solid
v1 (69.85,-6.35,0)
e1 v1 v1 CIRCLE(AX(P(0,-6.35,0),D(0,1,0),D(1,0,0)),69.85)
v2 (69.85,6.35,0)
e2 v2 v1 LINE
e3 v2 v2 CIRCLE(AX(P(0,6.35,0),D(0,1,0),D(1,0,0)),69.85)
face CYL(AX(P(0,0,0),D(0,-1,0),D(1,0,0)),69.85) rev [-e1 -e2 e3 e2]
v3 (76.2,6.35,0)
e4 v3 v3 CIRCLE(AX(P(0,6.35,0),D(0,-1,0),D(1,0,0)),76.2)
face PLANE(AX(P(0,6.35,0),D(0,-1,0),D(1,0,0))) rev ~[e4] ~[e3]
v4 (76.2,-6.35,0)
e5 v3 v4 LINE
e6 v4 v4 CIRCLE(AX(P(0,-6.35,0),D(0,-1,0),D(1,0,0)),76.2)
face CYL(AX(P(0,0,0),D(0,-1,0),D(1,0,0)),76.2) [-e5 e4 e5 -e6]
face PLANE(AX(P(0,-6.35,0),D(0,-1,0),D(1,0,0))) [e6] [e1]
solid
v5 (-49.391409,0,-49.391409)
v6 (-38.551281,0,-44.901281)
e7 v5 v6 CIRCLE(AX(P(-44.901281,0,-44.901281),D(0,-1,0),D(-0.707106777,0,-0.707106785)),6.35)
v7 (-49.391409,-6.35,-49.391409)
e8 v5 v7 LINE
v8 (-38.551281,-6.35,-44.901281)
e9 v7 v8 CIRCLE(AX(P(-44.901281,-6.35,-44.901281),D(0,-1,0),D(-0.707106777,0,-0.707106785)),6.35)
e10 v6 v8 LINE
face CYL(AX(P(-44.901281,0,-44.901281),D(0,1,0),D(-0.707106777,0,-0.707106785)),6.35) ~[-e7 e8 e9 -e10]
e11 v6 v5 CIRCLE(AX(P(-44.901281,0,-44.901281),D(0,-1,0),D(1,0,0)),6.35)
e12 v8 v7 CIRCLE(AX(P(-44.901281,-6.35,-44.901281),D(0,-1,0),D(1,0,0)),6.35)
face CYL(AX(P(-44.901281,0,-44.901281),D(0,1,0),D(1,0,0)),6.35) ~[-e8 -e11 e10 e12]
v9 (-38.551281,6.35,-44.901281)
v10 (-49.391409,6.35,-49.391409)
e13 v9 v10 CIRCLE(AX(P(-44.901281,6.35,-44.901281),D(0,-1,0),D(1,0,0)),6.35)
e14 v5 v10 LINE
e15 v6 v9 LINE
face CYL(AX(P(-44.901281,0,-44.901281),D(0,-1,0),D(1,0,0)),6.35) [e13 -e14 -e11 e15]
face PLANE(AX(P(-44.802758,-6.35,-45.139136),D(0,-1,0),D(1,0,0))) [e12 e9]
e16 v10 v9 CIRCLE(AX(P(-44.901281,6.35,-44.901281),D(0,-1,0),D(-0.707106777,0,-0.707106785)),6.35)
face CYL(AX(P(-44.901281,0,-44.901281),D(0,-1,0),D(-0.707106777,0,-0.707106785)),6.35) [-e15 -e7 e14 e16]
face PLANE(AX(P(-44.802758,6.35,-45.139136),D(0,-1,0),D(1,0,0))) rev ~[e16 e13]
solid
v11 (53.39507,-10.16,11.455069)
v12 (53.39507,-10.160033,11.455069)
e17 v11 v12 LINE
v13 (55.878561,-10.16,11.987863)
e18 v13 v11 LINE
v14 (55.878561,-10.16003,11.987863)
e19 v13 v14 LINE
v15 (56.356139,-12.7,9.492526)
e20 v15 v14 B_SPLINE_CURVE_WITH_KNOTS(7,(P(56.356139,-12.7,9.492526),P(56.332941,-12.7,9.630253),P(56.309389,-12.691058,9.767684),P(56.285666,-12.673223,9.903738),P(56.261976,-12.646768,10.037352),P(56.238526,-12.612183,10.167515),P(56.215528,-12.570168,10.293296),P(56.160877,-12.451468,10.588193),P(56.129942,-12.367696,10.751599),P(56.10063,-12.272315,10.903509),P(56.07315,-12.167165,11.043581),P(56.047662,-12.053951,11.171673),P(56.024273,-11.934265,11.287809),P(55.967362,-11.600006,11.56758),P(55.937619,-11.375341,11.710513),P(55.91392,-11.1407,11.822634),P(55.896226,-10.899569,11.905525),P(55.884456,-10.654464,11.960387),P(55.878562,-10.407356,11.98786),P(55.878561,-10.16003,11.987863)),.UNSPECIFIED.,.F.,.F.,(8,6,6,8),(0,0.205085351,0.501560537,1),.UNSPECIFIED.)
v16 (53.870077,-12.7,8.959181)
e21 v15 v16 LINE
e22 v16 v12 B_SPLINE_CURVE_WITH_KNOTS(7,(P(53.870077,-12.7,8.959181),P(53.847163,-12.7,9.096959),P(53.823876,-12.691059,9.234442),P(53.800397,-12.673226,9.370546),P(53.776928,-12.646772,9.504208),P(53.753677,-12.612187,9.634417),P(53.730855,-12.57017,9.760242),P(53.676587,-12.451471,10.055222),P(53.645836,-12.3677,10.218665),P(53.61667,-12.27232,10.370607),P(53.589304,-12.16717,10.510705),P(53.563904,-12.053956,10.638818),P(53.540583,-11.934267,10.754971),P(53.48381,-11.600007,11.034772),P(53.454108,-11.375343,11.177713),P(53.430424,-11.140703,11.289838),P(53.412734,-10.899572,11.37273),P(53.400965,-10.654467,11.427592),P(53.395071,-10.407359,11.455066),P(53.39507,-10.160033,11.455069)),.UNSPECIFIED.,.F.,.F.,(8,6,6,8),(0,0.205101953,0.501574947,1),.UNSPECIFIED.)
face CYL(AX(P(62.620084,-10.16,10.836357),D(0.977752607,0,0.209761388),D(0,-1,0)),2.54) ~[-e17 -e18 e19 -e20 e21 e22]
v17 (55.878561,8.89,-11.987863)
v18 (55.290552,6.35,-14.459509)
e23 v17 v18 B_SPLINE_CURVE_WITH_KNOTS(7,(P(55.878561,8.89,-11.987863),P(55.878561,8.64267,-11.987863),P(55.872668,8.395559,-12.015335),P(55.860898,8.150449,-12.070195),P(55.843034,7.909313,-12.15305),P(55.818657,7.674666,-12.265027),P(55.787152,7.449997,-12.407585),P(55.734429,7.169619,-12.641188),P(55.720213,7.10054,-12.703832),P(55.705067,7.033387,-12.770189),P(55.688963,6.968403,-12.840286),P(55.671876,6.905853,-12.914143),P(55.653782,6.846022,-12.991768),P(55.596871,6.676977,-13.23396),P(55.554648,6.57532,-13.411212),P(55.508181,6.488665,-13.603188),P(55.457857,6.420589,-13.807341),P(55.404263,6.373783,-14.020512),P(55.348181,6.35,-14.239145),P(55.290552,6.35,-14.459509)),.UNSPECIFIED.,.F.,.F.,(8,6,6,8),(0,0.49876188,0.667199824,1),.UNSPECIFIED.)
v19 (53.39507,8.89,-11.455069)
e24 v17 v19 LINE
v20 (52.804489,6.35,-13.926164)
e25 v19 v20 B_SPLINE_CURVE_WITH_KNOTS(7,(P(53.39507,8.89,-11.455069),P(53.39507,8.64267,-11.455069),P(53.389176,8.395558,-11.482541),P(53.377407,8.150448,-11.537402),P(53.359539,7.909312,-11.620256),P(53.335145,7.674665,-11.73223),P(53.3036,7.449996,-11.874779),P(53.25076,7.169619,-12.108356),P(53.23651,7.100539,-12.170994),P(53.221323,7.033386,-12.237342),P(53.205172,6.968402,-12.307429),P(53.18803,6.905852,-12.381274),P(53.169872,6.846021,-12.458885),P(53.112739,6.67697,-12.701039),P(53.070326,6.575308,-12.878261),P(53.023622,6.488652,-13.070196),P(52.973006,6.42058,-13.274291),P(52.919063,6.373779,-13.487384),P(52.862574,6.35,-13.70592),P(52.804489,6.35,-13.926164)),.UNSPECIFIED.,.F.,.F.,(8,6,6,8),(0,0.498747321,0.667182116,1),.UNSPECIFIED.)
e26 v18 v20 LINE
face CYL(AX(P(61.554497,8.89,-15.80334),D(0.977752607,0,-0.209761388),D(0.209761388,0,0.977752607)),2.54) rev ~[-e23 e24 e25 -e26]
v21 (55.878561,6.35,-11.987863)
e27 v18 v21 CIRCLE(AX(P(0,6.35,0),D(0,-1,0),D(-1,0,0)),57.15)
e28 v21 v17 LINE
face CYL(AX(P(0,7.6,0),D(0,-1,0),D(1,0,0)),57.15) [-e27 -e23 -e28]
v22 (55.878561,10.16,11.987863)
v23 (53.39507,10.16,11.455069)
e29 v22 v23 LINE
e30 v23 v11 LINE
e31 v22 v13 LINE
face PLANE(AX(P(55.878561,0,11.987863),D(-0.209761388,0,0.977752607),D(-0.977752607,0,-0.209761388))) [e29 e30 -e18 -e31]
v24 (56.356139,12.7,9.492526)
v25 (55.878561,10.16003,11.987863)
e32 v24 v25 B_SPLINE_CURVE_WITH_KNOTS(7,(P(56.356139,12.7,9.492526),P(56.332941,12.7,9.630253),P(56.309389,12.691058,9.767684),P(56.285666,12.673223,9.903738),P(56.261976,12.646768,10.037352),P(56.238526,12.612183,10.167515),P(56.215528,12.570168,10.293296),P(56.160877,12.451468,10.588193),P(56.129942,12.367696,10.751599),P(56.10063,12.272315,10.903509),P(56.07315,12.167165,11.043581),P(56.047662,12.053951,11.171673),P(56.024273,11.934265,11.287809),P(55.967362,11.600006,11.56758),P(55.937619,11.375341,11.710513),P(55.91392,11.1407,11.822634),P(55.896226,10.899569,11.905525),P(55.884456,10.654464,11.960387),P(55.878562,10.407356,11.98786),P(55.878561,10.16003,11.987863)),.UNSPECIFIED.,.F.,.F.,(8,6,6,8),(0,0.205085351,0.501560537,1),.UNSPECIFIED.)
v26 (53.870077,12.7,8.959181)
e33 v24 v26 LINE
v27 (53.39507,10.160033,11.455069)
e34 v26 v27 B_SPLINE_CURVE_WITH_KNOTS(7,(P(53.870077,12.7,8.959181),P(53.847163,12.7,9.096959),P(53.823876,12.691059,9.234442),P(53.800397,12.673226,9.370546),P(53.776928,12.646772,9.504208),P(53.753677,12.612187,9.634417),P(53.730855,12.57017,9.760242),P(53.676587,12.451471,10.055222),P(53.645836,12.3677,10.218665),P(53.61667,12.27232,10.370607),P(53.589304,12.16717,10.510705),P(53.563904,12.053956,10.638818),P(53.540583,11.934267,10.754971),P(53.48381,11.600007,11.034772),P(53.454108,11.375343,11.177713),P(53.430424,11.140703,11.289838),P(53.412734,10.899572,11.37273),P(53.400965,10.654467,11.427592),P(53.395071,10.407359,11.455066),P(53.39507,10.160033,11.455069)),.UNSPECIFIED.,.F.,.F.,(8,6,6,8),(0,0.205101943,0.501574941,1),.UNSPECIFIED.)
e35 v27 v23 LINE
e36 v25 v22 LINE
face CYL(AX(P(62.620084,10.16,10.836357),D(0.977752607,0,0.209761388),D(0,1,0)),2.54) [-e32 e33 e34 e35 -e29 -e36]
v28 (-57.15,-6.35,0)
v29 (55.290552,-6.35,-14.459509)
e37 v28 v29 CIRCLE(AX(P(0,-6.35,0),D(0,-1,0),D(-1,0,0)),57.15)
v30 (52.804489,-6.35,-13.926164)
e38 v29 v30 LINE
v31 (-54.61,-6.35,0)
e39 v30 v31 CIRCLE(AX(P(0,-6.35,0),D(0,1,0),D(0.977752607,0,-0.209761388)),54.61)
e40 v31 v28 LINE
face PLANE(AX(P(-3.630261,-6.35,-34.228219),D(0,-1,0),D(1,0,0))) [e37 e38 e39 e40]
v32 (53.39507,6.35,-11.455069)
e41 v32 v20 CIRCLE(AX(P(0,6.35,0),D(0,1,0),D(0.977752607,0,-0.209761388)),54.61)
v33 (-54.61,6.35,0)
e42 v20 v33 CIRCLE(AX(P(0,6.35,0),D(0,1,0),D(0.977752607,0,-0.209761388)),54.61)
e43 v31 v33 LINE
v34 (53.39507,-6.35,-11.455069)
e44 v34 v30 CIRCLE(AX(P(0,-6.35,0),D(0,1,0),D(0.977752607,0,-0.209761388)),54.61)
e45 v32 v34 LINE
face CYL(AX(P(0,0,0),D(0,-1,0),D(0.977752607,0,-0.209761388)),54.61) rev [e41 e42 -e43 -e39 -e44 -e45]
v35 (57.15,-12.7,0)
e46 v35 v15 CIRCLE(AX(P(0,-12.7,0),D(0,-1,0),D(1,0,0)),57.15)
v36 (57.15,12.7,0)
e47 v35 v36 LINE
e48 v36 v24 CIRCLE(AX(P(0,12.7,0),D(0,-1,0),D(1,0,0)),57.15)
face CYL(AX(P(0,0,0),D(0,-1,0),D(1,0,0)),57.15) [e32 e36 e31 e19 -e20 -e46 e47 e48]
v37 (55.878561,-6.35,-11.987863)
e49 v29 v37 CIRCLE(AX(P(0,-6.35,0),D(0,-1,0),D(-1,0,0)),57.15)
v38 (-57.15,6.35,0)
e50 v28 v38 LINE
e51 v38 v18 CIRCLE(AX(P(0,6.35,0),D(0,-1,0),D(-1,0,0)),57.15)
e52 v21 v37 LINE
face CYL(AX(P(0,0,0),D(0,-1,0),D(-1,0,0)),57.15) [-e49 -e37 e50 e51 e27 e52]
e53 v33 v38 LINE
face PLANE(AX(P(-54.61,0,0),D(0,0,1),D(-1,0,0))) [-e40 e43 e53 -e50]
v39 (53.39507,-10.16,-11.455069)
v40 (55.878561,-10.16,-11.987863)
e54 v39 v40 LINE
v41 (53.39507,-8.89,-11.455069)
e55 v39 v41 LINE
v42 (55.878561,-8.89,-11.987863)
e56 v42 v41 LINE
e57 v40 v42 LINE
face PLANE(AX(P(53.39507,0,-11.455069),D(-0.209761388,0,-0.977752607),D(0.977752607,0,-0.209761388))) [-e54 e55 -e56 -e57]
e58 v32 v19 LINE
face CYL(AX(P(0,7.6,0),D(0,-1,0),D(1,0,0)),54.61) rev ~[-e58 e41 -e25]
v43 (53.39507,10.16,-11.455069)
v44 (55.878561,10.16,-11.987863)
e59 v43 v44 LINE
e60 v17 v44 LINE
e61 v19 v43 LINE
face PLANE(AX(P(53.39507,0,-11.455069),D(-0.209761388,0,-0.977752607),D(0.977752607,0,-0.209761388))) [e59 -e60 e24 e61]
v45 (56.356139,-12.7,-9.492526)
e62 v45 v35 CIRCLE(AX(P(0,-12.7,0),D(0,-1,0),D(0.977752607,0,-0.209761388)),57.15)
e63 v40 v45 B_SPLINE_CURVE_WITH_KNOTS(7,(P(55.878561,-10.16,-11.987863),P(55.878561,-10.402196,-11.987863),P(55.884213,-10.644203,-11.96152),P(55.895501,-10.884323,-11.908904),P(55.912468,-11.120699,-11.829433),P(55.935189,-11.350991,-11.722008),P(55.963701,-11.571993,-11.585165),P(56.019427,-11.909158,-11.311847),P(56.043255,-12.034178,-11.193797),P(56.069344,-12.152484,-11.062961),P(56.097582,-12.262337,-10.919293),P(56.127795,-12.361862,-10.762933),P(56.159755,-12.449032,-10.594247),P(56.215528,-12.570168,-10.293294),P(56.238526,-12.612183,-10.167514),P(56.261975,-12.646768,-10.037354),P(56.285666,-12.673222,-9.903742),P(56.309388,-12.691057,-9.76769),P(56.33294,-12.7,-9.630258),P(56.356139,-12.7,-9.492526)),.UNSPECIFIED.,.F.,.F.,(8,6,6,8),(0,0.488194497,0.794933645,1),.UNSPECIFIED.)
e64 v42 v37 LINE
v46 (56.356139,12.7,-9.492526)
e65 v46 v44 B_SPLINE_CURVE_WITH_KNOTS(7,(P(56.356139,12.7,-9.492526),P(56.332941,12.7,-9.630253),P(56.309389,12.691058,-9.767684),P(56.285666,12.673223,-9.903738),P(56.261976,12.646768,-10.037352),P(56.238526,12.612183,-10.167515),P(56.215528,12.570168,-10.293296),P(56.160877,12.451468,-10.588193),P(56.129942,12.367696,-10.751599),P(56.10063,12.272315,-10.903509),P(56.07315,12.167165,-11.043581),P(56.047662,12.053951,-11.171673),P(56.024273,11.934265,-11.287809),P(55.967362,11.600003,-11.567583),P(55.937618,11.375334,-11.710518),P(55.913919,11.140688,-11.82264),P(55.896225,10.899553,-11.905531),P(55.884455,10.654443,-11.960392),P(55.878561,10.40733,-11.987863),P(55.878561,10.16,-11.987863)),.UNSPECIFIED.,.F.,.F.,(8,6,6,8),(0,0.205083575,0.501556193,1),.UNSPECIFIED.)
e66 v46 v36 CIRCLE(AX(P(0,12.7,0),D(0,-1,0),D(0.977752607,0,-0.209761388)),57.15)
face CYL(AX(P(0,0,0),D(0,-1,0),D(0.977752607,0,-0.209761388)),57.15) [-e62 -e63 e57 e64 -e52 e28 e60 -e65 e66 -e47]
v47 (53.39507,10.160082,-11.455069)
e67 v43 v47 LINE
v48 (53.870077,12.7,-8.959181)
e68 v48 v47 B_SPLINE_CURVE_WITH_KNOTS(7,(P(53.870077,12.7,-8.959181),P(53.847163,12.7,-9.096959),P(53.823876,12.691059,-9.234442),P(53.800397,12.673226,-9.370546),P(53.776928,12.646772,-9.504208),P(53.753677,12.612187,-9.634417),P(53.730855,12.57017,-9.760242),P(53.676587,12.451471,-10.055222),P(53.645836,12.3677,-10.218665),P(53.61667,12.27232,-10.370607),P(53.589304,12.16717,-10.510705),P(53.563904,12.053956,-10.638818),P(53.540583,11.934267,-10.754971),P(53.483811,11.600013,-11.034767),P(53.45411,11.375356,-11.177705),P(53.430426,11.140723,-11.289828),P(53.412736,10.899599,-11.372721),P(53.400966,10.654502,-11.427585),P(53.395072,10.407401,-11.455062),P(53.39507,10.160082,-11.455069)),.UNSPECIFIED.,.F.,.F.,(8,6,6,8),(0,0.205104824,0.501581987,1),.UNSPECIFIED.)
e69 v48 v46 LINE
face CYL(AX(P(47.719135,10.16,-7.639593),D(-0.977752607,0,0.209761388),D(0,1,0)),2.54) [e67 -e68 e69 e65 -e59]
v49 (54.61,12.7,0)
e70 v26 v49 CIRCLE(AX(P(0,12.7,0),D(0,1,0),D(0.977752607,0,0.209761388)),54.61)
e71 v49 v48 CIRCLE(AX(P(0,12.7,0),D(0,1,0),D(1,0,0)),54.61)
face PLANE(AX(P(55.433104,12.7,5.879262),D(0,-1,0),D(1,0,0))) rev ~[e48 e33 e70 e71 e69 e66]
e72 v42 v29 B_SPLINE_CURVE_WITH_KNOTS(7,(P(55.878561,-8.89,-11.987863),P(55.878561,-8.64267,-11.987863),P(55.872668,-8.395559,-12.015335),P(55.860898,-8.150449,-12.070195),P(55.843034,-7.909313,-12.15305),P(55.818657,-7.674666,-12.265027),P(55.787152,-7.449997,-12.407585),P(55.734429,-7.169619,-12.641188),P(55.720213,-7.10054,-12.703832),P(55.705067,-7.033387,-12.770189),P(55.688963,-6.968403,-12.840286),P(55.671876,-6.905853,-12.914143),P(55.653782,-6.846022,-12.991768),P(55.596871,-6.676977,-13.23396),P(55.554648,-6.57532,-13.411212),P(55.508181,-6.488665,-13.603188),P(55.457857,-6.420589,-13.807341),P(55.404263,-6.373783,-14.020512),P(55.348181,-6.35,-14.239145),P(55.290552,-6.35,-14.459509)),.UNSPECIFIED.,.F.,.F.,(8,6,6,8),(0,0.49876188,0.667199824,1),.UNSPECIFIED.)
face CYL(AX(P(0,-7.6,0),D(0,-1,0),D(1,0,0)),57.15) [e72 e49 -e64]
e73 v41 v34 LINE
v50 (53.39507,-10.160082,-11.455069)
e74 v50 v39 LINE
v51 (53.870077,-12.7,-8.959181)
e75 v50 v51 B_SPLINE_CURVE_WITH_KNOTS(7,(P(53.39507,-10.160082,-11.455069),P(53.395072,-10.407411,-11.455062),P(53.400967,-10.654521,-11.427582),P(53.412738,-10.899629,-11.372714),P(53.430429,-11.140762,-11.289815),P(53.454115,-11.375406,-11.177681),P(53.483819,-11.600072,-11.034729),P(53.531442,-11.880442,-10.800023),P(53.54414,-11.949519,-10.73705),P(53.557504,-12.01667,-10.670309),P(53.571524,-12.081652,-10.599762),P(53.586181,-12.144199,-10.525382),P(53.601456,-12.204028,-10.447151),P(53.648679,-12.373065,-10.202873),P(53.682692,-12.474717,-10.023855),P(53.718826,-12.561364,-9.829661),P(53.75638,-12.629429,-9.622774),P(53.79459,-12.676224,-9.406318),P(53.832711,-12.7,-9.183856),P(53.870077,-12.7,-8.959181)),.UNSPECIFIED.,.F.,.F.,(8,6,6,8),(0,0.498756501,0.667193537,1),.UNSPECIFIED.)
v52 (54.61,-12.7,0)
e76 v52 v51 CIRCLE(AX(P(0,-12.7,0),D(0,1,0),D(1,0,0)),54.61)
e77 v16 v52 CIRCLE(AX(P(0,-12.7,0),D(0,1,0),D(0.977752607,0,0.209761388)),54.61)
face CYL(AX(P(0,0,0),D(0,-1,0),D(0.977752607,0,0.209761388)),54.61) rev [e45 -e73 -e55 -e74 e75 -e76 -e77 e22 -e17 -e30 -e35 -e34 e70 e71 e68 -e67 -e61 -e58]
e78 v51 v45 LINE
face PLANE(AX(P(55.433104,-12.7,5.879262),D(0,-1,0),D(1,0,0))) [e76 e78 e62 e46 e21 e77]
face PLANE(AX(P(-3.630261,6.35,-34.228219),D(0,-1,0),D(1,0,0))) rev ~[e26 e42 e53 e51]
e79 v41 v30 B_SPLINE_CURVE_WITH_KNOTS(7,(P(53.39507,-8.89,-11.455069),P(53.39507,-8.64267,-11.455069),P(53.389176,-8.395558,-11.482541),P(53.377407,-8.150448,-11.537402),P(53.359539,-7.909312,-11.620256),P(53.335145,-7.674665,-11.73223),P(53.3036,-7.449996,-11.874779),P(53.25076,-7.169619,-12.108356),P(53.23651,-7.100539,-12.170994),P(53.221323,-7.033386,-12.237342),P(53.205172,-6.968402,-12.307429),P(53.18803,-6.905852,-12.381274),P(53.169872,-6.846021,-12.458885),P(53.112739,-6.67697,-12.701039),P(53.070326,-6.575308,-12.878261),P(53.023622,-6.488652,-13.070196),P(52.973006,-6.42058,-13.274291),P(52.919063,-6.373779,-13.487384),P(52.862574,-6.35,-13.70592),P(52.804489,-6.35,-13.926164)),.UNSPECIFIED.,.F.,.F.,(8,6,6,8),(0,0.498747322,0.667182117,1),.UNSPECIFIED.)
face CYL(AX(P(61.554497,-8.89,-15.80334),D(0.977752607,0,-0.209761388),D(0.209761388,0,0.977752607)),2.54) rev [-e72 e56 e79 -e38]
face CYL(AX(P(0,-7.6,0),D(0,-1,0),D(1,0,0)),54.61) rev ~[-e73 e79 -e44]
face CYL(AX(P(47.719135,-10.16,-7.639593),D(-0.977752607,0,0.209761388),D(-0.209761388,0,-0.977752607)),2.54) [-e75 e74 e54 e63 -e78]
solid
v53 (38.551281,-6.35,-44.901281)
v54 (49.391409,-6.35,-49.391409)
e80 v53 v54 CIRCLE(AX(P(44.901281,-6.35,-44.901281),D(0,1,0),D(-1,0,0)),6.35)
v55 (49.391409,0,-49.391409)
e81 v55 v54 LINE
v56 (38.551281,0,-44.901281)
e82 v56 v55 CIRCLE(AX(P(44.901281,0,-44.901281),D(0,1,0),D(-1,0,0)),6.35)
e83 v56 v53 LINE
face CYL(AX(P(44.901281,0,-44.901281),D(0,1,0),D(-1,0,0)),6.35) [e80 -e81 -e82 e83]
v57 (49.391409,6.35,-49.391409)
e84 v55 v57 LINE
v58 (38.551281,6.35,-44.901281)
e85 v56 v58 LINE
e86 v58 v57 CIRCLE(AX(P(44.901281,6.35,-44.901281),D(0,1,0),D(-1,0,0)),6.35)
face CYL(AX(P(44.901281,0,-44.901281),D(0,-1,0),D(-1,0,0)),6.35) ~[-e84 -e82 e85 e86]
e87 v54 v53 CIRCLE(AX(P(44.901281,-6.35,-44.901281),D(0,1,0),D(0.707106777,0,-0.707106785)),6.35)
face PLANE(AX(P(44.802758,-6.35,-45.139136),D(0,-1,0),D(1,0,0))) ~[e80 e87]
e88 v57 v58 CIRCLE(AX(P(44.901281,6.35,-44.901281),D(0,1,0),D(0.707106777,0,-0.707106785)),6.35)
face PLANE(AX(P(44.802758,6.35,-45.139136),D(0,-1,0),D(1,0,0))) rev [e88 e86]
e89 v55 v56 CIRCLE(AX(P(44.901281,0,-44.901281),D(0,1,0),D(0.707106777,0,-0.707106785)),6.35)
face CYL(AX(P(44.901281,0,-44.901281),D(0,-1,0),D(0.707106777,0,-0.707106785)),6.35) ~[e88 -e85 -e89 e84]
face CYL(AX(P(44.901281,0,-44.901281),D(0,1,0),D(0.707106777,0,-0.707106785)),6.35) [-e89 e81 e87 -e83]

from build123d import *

# Parameters (mm, degrees)
F1_R         = 76.2
F2_DEPTH     = 6.35
F5_DEPTH     = 6.35
F6_DEPTH     = 12.7
F7_T4_DEPTH  = 15.24
F7_S5_R      = 54.61
F7_T6_DEPTH  = 10
F7_S7_R      = 57.15
F7_T8_DEPTH  = 10
F7_T12_DEPTH = 15.24
F7_S13_R     = 54.61
F7_T14_DEPTH = 10
F7_S15_R     = 57.15
F7_T16_DEPTH = 10
F7_T17_DEPTH = 15.24
F7_T19_DEPTH = 15.24


# Not quite as in the source:
# - a fillet or chamfer that OpenCascade refuses, or shapes differently, is made with other operations: its cross-section is extruded or revolved along the edge and cut away or added
# - a feature of the source that left no trace in its solid (it failed there, or was rolled back) is left out
# - a pattern or mirror of a feature is missing from the dataset's text; its kind, count and spacing are read off the source's solid


with BuildPart() as f2:
    # F1 (on Front) → F2 (new body, symmetric)
    with BuildSketch(Plane.XZ):
        Circle(F1_R)
        with BuildLine():
            ThreePointArc((-49.3914086403, -49.3914086914), (-26.7304377674, 64.532985339), (69.85, 0))
            ThreePointArc((69.85, 0), (26.7304377674, -64.532985339), (-49.3914086403, -49.3914086914))
        make_face(mode=Mode.SUBTRACT)
    extrude(amount=F2_DEPTH, both=True)


with BuildPart() as f2b:
    # F1 (on Front) → F2, piece 2 (new body, symmetric)
    with BuildSketch(Plane.XZ):
        with BuildLine():
            ThreePointArc((-38.5512806053, -44.9012806053), (-47.3313204176, -39.0346455808), (-49.3914086403, -49.3914086914))
            ThreePointArc((-49.3914086403, -49.3914086914), (-42.4712407931, -50.7679156299), (-38.5512806053, -44.9012806053))
        make_face()
    extrude(amount=F2_DEPTH, both=True)


with BuildPart() as f2_2_copies_1:
    # F2_2_copies: instance of F2b
    add(f2b.part.mirror(Plane(origin=(0, 0, 0), x_dir=(0, 0, 1), z_dir=(1, 0, 0))))


with BuildPart() as f5:
    # F4 (on Front) → F5 (new body, symmetric)
    with BuildSketch(Plane.XZ):
        with BuildLine():
            ThreePointArc((-57.15, 0), (-6.0275497336, -56.831251475), (55.8785614771, -11.9878633311))
            Line((55.8785614771, -11.9878633311), (53.3950698559, -11.4550694053))
            ThreePointArc((53.3950698559, -11.4550694053), (-5.7596586343, -54.3054180761), (-54.61, 0))
            Line((-54.61, 0), (-57.15, 0))
        make_face()
    extrude(amount=F5_DEPTH, both=True)

    # F4 (on Front) → F6 (join, symmetric)
    with BuildSketch(Plane.XZ):
        with BuildLine():
            Line((54.61, 0), (57.15, 0))
            ThreePointArc((57.15, 0), (56.831251475, 6.0275497336), (55.8785614771, 11.9878633311))
            Line((55.8785614771, 11.9878633311), (53.3950698559, 11.4550694053))
            ThreePointArc((53.3950698559, 11.4550694053), (54.3054180761, 5.7596586343), (54.61, 0))
        make_face()
        with BuildLine():
            ThreePointArc((55.8785614771, -11.9878633311), (56.831251475, -6.0275497336), (57.15, 0))
            Line((57.15, 0), (54.61, 0))
            ThreePointArc((54.61, 0), (54.3054180761, -5.7596586343), (53.3950698559, -11.4550694053))
            Line((53.3950698559, -11.4550694053), (55.8785614771, -11.9878633311))
        make_face()
    extrude(amount=F6_DEPTH, both=True)

    # F7: fillet of radius 2.54 on 6 edges, made by hand


with BuildPart() as f7_tool2:
    # F7_s3 → F7_t4 (new body)
    with BuildSketch(Plane(origin=(62.0872905302, 0, -13.3198481457), x_dir=(0, 1, 0), z_dir=(-0.9777526068, 0, 0.2097613881))):
        with BuildLine():
            ThreePointArc((8.89, 0), (7.0939487758, 0.7439487758), (6.35, 2.54))
            Line((6.35, 2.54), (6.35, 0))
            Line((6.35, 0), (8.89, 0))
        make_face()
    extrude(amount=F7_T4_DEPTH)

    # F7_s5 → F7_t6 (cut, symmetric)
    with BuildSketch(Plane.XZ.offset(-7.6)):
        Circle(F7_S5_R)
    extrude(amount=F7_T6_DEPTH, both=True, mode=Mode.SUBTRACT)

    # F7_s7 → F7_t8 (intersect, symmetric)
    with BuildSketch(Plane.XZ.offset(-7.6)):
        Circle(F7_S7_R)
    extrude(amount=F7_T8_DEPTH, both=True, mode=Mode.INTERSECT)


with BuildPart() as f5_1:
    add(f5.part)

    # F7_t1: union F7_tool2
    add(f7_tool2.part)


with BuildPart() as f7_tool10:
    # F7_s11 → F7_t12 (new body)
    with BuildSketch(Plane(origin=(62.0872905302, 0, -13.3198481457), x_dir=(0, 1, 0), z_dir=(-0.9777526068, 0, 0.2097613881))):
        with BuildLine():
            ThreePointArc((-8.89, 0), (-7.0939487758, 0.7439487758), (-6.35, 2.54))
            Line((-6.35, 2.54), (-6.35, 0))
            Line((-6.35, 0), (-8.89, 0))
        make_face()
    extrude(amount=F7_T12_DEPTH)

    # F7_s13 → F7_t14 (cut, symmetric)
    with BuildSketch(Plane.XZ.offset(7.6)):
        Circle(F7_S13_R)
    extrude(amount=F7_T14_DEPTH, both=True, mode=Mode.SUBTRACT)

    # F7_s15 → F7_t16 (intersect, symmetric)
    with BuildSketch(Plane.XZ.offset(7.6)):
        Circle(F7_S15_R)
    extrude(amount=F7_T16_DEPTH, both=True, mode=Mode.INTERSECT)


with BuildPart() as f5_2:
    add(f5_1.part)

    # F7_t9: union F7_tool10
    add(f7_tool10.part)

    # F7_s18 → F7_t17 (cut)
    with BuildSketch(Plane(origin=(47.1863408029, 0, -10.1230845907), x_dir=(0, 1, 0), z_dir=(0.9777526068, 0, -0.2097613881))):
        with BuildLine():
            ThreePointArc((-10.16, 0), (-11.9560512242, 0.7439487758), (-12.7, 2.54))
            Line((-12.7, 2.54), (-12.7, 0))
            Line((-12.7, 0), (-10.16, 0))
        make_face()
        with BuildLine():
            ThreePointArc((12.7, 2.54), (11.9560512242, 0.7439487758), (10.16, 0))
            Line((10.16, 0), (12.7, 0))
            Line((12.7, 0), (12.7, 2.54))
        make_face()
    extrude(amount=F7_T17_DEPTH, mode=Mode.SUBTRACT)

    # F7_s20 → F7_t19 (cut)
    with BuildSketch(Plane(origin=(62.0872905302, 0, 13.3198481457), x_dir=(0, 1, 0), z_dir=(-0.9777526068, 0, -0.2097613881))):
        with BuildLine():
            ThreePointArc((-12.7, 2.54), (-11.9560512242, 0.7439487758), (-10.16, 0))
            Line((-10.16, 0), (-12.7, 0))
            Line((-12.7, 0), (-12.7, 2.54))
        make_face()
        with BuildLine():
            ThreePointArc((12.7, 2.54), (11.9560512242, 0.7439487758), (10.16, 0))
            Line((10.16, 0), (12.7, 0))
            Line((12.7, 0), (12.7, 2.54))
        make_face()
    extrude(amount=F7_T19_DEPTH, mode=Mode.SUBTRACT)


solid = Compound([f2.part, f2b.part, f2_2_copies_1.part, f5_2.part])
